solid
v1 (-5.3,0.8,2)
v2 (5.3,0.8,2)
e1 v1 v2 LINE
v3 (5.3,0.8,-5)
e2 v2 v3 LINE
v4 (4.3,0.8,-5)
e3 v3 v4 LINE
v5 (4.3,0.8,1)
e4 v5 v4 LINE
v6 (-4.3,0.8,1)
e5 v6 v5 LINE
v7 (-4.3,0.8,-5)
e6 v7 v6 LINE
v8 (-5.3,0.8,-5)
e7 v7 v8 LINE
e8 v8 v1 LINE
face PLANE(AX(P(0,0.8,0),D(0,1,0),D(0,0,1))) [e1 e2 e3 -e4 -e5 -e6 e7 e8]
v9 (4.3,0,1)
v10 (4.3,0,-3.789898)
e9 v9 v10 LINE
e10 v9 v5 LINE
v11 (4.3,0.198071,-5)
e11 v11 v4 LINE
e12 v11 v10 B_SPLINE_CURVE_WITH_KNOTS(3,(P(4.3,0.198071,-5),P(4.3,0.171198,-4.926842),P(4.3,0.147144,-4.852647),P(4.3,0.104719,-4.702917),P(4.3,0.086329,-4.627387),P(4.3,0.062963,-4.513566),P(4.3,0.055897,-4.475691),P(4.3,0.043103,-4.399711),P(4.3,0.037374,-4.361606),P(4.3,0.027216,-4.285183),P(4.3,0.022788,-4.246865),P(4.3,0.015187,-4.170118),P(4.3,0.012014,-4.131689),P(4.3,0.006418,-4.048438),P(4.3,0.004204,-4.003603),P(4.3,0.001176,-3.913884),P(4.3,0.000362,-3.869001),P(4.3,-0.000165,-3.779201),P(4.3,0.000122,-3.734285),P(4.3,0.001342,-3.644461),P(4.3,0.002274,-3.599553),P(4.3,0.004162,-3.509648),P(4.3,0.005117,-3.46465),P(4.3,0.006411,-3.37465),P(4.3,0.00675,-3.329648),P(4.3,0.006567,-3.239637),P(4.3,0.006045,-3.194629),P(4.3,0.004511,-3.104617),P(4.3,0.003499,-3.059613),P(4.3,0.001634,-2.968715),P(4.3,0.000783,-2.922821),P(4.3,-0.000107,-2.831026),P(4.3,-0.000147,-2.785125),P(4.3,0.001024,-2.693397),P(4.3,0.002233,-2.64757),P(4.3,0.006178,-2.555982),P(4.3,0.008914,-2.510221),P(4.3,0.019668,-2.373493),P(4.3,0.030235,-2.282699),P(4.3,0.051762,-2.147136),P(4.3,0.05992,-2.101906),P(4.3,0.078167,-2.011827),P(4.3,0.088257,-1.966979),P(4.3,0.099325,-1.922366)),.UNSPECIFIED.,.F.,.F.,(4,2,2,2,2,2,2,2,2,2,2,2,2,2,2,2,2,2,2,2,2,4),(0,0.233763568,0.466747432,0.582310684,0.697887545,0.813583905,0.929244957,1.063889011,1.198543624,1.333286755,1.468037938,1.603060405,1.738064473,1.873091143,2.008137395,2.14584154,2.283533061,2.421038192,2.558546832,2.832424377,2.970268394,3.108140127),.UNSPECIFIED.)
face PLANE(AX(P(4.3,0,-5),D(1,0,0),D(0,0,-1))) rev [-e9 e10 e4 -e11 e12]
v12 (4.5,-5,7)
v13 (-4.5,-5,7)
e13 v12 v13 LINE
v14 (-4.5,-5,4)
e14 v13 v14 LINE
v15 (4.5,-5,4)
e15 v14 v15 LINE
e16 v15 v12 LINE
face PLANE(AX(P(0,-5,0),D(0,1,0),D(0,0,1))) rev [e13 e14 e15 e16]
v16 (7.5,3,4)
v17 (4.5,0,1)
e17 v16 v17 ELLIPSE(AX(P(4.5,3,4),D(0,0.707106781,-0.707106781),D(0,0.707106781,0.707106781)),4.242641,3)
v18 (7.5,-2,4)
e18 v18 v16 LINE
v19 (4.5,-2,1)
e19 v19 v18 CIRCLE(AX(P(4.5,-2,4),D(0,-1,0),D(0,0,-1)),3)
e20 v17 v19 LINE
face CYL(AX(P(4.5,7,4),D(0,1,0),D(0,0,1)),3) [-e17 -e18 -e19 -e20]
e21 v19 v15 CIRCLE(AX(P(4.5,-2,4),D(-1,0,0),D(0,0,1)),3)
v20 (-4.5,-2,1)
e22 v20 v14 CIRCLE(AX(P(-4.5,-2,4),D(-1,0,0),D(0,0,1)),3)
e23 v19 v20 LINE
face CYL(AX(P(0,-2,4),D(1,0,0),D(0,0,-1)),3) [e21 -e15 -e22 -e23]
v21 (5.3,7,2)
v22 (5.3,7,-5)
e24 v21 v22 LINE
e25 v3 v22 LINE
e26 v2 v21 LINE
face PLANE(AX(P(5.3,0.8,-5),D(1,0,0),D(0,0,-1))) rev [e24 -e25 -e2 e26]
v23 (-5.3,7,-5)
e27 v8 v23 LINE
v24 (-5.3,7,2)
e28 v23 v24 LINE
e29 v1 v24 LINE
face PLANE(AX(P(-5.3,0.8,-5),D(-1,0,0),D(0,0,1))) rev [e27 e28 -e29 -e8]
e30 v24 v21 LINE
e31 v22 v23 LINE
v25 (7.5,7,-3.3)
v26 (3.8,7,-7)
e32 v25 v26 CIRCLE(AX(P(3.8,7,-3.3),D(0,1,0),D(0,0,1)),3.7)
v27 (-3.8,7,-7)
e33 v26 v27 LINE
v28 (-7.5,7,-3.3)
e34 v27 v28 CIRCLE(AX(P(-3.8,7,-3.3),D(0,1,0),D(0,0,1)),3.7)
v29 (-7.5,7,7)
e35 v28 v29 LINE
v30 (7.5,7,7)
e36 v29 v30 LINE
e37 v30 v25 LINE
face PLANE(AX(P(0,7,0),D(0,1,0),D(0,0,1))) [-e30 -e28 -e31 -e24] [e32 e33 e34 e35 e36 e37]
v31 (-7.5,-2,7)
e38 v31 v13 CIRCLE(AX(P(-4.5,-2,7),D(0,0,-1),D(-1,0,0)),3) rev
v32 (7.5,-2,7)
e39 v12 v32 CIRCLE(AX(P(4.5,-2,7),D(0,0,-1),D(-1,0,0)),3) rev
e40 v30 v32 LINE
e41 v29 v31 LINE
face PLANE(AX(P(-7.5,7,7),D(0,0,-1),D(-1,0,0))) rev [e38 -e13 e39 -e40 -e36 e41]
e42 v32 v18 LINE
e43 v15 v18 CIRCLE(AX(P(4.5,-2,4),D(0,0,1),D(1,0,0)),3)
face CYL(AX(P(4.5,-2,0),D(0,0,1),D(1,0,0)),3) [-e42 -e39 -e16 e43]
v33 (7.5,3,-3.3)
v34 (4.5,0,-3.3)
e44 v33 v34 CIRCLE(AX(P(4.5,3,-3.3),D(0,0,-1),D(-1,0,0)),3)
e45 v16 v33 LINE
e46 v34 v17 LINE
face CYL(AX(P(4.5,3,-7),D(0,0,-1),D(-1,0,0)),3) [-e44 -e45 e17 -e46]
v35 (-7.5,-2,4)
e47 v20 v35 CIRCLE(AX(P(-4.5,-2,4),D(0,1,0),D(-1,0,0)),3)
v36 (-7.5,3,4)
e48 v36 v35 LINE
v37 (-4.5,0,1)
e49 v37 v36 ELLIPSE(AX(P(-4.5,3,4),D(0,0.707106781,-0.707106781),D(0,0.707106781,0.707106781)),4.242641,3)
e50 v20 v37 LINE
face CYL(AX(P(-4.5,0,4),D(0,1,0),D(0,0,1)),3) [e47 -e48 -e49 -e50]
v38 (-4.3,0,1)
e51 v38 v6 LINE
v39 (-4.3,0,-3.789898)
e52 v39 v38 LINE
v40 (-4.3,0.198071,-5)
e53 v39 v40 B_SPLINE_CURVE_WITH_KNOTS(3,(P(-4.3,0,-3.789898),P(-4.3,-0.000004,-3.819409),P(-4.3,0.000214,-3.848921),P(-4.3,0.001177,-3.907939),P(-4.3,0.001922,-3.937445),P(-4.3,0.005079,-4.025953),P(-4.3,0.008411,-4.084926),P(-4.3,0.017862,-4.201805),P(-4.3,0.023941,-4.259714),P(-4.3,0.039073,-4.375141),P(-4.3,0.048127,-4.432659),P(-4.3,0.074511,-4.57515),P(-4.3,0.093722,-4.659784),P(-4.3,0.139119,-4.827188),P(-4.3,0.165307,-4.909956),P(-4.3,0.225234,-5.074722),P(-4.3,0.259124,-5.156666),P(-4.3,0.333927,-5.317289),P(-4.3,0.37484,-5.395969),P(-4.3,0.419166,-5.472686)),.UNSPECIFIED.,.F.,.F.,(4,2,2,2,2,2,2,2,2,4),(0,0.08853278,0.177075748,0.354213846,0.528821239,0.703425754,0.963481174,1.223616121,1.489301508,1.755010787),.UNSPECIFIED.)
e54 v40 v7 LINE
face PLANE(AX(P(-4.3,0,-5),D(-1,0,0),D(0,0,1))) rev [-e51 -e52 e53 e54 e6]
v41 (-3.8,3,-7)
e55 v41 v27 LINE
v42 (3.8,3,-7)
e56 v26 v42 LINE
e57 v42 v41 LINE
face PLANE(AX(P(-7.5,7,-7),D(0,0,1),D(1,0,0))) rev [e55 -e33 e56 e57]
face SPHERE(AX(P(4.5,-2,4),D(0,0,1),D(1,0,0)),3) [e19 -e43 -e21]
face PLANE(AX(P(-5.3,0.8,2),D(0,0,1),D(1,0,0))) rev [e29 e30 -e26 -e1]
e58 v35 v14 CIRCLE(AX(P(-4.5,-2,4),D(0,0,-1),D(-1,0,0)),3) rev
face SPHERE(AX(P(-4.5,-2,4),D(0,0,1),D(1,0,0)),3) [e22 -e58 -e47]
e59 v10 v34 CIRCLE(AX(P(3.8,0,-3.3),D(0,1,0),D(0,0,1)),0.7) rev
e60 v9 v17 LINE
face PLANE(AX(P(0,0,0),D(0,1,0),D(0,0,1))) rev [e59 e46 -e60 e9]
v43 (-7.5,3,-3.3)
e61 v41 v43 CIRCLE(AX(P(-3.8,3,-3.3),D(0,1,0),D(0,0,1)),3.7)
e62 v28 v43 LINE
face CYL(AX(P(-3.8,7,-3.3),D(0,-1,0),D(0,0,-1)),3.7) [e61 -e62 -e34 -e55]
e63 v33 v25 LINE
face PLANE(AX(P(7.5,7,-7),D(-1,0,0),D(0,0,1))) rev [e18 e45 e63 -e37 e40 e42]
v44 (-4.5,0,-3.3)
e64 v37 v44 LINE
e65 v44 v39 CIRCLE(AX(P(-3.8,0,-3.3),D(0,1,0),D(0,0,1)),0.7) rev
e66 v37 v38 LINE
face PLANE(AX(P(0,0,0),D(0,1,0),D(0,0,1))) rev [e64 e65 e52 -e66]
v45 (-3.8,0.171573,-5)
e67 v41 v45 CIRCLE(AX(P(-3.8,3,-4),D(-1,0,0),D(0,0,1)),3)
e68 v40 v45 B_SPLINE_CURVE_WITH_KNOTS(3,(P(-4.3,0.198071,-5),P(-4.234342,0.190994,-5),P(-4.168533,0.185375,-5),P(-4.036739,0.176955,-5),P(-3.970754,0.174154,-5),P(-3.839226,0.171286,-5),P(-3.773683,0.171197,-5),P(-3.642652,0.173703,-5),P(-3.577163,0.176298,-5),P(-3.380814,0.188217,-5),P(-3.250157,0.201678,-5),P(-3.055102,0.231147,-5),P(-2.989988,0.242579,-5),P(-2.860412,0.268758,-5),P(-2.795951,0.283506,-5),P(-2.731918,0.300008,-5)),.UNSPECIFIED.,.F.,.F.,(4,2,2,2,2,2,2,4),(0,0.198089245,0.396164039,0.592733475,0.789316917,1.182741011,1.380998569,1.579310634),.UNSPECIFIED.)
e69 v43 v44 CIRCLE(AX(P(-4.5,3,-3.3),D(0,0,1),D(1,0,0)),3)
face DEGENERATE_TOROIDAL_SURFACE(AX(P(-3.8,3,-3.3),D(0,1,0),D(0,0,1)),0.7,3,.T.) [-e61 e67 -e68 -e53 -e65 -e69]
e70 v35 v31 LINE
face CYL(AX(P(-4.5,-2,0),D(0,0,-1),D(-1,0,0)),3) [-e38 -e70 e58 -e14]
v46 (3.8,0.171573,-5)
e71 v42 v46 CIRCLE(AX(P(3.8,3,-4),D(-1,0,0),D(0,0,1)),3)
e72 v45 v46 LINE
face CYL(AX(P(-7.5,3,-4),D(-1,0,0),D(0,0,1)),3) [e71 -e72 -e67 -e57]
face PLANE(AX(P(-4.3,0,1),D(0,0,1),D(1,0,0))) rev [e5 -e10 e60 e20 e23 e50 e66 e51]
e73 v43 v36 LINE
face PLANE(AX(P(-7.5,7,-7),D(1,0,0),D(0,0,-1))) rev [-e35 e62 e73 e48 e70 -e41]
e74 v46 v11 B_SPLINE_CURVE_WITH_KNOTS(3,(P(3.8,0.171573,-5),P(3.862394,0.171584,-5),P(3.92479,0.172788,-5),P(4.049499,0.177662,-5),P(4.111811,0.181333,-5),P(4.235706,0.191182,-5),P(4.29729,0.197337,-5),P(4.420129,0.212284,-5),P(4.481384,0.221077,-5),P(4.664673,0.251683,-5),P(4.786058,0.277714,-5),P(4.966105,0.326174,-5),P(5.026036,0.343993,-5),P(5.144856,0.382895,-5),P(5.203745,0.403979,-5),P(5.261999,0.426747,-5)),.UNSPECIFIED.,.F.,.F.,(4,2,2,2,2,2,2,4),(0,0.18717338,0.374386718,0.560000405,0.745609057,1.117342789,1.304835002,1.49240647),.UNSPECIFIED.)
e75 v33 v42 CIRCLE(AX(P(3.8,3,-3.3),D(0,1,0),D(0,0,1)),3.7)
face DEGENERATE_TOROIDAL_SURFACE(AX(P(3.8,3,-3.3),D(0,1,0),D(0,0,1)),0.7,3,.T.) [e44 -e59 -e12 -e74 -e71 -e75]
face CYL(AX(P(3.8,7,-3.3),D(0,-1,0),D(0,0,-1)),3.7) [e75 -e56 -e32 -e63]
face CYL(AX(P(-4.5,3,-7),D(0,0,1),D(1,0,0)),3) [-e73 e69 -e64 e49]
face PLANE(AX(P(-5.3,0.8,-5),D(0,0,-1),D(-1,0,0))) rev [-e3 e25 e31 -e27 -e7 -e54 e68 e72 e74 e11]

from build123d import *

# Parameters (mm, degrees)
SKETCH1_W           = 15
SKETCH1_H           = 14
BOSS_EXTRUDE1_DEPTH = 7
FILLET1_R           = 3.7
SKETCH2_W           = 10.6
SKETCH2_H           = 7
CUT_EXTRUDE1_DEPTH  = 6.2
SKETCH3_W           = 8.6
SKETCH3_H           = 6
CUT_EXTRUDE2_DEPTH  = 12.987076374
SKETCH4_W           = 15
SKETCH4_H           = 6
BOSS_EXTRUDE2_DEPTH = 5
FILLET8_R           = 3
FILLET9_R           = 3
FILLET10_R          = 3


with BuildPart() as part:
    # Sketch1 → Boss-Extrude1 (new body)
    with BuildSketch(Plane(origin=(0, 0, 0), x_dir=(1, 0, 0), z_dir=(0, 1, 0))):
        Rectangle(SKETCH1_W, SKETCH1_H)
    extrude(amount=BOSS_EXTRUDE1_DEPTH)

    # Fillet1
    fillet1_edges = [part.edges().sort_by_distance(p)[0] for p in [
        (-7.5, 3.5, -7),
        (7.5, 3.5, -7),
    ]]
    fillet(fillet1_edges, radius=FILLET1_R)

    # Sketch2 → Cut-Extrude1 (cut)
    with BuildSketch(Plane(origin=(0, 7, 0), x_dir=(1, 0, 0), z_dir=(0, 1, 0))):
        with Locations((0, 1.5)):
            Rectangle(SKETCH2_W, SKETCH2_H)
    extrude(amount=-CUT_EXTRUDE1_DEPTH, mode=Mode.SUBTRACT)

    # Sketch3 → Cut-Extrude2 (cut, through all)
    with BuildSketch(Plane(origin=(0, 0.8, 0), x_dir=(1, 0, 0), z_dir=(0, 1, 0))):
        with Locations((0, 2)):
            Rectangle(SKETCH3_W, SKETCH3_H)
    extrude(amount=-CUT_EXTRUDE2_DEPTH, mode=Mode.SUBTRACT)

    # Sketch4 → Boss-Extrude2 (add)
    with BuildSketch(Plane.XZ):
        with Locations((0, 4)):
            Rectangle(SKETCH4_W, SKETCH4_H)
    extrude(amount=BOSS_EXTRUDE2_DEPTH)

    # Fillet8
    fillet8_edges = [part.edges().sort_by_distance(p)[0] for p in [
        (-7.5, -5, 4),
        (7.5, -5, 4),
    ]]
    fillet(fillet8_edges, radius=FILLET8_R)

    # Fillet9
    # the kernel refuses this fillet: 3 mm, written as the material it takes off along each edge
    with BuildSketch(Plane(origin=(-3.8, 0, -3.3), x_dir=(0, 0, -1), z_dir=(1, 0, 0))) as fillet9_piece_1:
        with BuildLine():
            CenterArc((3.7 - FILLET9_R, FILLET9_R), FILLET9_R, 270, 90)
            Line((3.7, FILLET9_R), (3.7, 0))
            Line((3.7, 0), (3.7 - FILLET9_R, 0))
        make_face()
    revolve(axis=Axis((-3.8, 0, -3.3), (0, 1, 0)), revolution_arc=90, mode=Mode.SUBTRACT)
    with BuildSketch(Plane(origin=(3.8, 0, -3.3), x_dir=(0, 0, -1), z_dir=(-1, 0, 0))) as fillet9_piece_2:
        with BuildLine():
            CenterArc((3.7 - FILLET9_R, -FILLET9_R), FILLET9_R, 0, 90)
            Line((3.7, -FILLET9_R), (3.7, 0))
            Line((3.7, 0), (3.7 - FILLET9_R, 0))
        make_face()
    revolve(axis=Axis((3.8, 0, -3.3), (0, -1, 0)), revolution_arc=90, mode=Mode.SUBTRACT)
    with BuildSketch(Plane(origin=(-7.5, 0, 1), x_dir=(0, 1, 0), z_dir=(0, 0, -1))) as fillet9_piece_3:
        with BuildLine():
            CenterArc((FILLET9_R, FILLET9_R), FILLET9_R, 180, 90)
            Line((0, FILLET9_R), (0, 0))
            Line((0, 0), (FILLET9_R, 0))
        make_face()
    extrude(amount=4.3, mode=Mode.SUBTRACT)
    with BuildSketch(Plane(origin=(7.5, 0, -3.3), x_dir=(-1, 0, 0), z_dir=(0, 0, 1))) as fillet9_piece_4:
        with BuildLine():
            CenterArc((FILLET9_R, -FILLET9_R), FILLET9_R, 90, 90)
            Line((0, -FILLET9_R), (0, 0))
            Line((0, 0), (FILLET9_R, 0))
        make_face()
    extrude(amount=4.3, mode=Mode.SUBTRACT)
    with BuildSketch(Plane(origin=(-3.8, 0, -7), x_dir=(0, 0, 1), z_dir=(1, 0, 0))) as fillet9_piece_5:
        with BuildLine():
            CenterArc((FILLET9_R, -FILLET9_R), FILLET9_R, 90, 90)
            Line((0, -FILLET9_R), (0, 0))
            Line((0, 0), (FILLET9_R, 0))
        make_face()
    extrude(amount=7.6, mode=Mode.SUBTRACT)

    # Fillet10
    fillet10_edges = [part.edges().sort_by_distance(p)[0] for p in [
        (0, -5, 1),
        (7.5, 0.5, 1),
        (-7.5, 0.5, 1),
        (6.621320344, -4.121320344, 1),
        (-6.621320344, -4.121320344, 1),
    ]]
    fillet(fillet10_edges, radius=FILLET10_R)


solid = part.part
